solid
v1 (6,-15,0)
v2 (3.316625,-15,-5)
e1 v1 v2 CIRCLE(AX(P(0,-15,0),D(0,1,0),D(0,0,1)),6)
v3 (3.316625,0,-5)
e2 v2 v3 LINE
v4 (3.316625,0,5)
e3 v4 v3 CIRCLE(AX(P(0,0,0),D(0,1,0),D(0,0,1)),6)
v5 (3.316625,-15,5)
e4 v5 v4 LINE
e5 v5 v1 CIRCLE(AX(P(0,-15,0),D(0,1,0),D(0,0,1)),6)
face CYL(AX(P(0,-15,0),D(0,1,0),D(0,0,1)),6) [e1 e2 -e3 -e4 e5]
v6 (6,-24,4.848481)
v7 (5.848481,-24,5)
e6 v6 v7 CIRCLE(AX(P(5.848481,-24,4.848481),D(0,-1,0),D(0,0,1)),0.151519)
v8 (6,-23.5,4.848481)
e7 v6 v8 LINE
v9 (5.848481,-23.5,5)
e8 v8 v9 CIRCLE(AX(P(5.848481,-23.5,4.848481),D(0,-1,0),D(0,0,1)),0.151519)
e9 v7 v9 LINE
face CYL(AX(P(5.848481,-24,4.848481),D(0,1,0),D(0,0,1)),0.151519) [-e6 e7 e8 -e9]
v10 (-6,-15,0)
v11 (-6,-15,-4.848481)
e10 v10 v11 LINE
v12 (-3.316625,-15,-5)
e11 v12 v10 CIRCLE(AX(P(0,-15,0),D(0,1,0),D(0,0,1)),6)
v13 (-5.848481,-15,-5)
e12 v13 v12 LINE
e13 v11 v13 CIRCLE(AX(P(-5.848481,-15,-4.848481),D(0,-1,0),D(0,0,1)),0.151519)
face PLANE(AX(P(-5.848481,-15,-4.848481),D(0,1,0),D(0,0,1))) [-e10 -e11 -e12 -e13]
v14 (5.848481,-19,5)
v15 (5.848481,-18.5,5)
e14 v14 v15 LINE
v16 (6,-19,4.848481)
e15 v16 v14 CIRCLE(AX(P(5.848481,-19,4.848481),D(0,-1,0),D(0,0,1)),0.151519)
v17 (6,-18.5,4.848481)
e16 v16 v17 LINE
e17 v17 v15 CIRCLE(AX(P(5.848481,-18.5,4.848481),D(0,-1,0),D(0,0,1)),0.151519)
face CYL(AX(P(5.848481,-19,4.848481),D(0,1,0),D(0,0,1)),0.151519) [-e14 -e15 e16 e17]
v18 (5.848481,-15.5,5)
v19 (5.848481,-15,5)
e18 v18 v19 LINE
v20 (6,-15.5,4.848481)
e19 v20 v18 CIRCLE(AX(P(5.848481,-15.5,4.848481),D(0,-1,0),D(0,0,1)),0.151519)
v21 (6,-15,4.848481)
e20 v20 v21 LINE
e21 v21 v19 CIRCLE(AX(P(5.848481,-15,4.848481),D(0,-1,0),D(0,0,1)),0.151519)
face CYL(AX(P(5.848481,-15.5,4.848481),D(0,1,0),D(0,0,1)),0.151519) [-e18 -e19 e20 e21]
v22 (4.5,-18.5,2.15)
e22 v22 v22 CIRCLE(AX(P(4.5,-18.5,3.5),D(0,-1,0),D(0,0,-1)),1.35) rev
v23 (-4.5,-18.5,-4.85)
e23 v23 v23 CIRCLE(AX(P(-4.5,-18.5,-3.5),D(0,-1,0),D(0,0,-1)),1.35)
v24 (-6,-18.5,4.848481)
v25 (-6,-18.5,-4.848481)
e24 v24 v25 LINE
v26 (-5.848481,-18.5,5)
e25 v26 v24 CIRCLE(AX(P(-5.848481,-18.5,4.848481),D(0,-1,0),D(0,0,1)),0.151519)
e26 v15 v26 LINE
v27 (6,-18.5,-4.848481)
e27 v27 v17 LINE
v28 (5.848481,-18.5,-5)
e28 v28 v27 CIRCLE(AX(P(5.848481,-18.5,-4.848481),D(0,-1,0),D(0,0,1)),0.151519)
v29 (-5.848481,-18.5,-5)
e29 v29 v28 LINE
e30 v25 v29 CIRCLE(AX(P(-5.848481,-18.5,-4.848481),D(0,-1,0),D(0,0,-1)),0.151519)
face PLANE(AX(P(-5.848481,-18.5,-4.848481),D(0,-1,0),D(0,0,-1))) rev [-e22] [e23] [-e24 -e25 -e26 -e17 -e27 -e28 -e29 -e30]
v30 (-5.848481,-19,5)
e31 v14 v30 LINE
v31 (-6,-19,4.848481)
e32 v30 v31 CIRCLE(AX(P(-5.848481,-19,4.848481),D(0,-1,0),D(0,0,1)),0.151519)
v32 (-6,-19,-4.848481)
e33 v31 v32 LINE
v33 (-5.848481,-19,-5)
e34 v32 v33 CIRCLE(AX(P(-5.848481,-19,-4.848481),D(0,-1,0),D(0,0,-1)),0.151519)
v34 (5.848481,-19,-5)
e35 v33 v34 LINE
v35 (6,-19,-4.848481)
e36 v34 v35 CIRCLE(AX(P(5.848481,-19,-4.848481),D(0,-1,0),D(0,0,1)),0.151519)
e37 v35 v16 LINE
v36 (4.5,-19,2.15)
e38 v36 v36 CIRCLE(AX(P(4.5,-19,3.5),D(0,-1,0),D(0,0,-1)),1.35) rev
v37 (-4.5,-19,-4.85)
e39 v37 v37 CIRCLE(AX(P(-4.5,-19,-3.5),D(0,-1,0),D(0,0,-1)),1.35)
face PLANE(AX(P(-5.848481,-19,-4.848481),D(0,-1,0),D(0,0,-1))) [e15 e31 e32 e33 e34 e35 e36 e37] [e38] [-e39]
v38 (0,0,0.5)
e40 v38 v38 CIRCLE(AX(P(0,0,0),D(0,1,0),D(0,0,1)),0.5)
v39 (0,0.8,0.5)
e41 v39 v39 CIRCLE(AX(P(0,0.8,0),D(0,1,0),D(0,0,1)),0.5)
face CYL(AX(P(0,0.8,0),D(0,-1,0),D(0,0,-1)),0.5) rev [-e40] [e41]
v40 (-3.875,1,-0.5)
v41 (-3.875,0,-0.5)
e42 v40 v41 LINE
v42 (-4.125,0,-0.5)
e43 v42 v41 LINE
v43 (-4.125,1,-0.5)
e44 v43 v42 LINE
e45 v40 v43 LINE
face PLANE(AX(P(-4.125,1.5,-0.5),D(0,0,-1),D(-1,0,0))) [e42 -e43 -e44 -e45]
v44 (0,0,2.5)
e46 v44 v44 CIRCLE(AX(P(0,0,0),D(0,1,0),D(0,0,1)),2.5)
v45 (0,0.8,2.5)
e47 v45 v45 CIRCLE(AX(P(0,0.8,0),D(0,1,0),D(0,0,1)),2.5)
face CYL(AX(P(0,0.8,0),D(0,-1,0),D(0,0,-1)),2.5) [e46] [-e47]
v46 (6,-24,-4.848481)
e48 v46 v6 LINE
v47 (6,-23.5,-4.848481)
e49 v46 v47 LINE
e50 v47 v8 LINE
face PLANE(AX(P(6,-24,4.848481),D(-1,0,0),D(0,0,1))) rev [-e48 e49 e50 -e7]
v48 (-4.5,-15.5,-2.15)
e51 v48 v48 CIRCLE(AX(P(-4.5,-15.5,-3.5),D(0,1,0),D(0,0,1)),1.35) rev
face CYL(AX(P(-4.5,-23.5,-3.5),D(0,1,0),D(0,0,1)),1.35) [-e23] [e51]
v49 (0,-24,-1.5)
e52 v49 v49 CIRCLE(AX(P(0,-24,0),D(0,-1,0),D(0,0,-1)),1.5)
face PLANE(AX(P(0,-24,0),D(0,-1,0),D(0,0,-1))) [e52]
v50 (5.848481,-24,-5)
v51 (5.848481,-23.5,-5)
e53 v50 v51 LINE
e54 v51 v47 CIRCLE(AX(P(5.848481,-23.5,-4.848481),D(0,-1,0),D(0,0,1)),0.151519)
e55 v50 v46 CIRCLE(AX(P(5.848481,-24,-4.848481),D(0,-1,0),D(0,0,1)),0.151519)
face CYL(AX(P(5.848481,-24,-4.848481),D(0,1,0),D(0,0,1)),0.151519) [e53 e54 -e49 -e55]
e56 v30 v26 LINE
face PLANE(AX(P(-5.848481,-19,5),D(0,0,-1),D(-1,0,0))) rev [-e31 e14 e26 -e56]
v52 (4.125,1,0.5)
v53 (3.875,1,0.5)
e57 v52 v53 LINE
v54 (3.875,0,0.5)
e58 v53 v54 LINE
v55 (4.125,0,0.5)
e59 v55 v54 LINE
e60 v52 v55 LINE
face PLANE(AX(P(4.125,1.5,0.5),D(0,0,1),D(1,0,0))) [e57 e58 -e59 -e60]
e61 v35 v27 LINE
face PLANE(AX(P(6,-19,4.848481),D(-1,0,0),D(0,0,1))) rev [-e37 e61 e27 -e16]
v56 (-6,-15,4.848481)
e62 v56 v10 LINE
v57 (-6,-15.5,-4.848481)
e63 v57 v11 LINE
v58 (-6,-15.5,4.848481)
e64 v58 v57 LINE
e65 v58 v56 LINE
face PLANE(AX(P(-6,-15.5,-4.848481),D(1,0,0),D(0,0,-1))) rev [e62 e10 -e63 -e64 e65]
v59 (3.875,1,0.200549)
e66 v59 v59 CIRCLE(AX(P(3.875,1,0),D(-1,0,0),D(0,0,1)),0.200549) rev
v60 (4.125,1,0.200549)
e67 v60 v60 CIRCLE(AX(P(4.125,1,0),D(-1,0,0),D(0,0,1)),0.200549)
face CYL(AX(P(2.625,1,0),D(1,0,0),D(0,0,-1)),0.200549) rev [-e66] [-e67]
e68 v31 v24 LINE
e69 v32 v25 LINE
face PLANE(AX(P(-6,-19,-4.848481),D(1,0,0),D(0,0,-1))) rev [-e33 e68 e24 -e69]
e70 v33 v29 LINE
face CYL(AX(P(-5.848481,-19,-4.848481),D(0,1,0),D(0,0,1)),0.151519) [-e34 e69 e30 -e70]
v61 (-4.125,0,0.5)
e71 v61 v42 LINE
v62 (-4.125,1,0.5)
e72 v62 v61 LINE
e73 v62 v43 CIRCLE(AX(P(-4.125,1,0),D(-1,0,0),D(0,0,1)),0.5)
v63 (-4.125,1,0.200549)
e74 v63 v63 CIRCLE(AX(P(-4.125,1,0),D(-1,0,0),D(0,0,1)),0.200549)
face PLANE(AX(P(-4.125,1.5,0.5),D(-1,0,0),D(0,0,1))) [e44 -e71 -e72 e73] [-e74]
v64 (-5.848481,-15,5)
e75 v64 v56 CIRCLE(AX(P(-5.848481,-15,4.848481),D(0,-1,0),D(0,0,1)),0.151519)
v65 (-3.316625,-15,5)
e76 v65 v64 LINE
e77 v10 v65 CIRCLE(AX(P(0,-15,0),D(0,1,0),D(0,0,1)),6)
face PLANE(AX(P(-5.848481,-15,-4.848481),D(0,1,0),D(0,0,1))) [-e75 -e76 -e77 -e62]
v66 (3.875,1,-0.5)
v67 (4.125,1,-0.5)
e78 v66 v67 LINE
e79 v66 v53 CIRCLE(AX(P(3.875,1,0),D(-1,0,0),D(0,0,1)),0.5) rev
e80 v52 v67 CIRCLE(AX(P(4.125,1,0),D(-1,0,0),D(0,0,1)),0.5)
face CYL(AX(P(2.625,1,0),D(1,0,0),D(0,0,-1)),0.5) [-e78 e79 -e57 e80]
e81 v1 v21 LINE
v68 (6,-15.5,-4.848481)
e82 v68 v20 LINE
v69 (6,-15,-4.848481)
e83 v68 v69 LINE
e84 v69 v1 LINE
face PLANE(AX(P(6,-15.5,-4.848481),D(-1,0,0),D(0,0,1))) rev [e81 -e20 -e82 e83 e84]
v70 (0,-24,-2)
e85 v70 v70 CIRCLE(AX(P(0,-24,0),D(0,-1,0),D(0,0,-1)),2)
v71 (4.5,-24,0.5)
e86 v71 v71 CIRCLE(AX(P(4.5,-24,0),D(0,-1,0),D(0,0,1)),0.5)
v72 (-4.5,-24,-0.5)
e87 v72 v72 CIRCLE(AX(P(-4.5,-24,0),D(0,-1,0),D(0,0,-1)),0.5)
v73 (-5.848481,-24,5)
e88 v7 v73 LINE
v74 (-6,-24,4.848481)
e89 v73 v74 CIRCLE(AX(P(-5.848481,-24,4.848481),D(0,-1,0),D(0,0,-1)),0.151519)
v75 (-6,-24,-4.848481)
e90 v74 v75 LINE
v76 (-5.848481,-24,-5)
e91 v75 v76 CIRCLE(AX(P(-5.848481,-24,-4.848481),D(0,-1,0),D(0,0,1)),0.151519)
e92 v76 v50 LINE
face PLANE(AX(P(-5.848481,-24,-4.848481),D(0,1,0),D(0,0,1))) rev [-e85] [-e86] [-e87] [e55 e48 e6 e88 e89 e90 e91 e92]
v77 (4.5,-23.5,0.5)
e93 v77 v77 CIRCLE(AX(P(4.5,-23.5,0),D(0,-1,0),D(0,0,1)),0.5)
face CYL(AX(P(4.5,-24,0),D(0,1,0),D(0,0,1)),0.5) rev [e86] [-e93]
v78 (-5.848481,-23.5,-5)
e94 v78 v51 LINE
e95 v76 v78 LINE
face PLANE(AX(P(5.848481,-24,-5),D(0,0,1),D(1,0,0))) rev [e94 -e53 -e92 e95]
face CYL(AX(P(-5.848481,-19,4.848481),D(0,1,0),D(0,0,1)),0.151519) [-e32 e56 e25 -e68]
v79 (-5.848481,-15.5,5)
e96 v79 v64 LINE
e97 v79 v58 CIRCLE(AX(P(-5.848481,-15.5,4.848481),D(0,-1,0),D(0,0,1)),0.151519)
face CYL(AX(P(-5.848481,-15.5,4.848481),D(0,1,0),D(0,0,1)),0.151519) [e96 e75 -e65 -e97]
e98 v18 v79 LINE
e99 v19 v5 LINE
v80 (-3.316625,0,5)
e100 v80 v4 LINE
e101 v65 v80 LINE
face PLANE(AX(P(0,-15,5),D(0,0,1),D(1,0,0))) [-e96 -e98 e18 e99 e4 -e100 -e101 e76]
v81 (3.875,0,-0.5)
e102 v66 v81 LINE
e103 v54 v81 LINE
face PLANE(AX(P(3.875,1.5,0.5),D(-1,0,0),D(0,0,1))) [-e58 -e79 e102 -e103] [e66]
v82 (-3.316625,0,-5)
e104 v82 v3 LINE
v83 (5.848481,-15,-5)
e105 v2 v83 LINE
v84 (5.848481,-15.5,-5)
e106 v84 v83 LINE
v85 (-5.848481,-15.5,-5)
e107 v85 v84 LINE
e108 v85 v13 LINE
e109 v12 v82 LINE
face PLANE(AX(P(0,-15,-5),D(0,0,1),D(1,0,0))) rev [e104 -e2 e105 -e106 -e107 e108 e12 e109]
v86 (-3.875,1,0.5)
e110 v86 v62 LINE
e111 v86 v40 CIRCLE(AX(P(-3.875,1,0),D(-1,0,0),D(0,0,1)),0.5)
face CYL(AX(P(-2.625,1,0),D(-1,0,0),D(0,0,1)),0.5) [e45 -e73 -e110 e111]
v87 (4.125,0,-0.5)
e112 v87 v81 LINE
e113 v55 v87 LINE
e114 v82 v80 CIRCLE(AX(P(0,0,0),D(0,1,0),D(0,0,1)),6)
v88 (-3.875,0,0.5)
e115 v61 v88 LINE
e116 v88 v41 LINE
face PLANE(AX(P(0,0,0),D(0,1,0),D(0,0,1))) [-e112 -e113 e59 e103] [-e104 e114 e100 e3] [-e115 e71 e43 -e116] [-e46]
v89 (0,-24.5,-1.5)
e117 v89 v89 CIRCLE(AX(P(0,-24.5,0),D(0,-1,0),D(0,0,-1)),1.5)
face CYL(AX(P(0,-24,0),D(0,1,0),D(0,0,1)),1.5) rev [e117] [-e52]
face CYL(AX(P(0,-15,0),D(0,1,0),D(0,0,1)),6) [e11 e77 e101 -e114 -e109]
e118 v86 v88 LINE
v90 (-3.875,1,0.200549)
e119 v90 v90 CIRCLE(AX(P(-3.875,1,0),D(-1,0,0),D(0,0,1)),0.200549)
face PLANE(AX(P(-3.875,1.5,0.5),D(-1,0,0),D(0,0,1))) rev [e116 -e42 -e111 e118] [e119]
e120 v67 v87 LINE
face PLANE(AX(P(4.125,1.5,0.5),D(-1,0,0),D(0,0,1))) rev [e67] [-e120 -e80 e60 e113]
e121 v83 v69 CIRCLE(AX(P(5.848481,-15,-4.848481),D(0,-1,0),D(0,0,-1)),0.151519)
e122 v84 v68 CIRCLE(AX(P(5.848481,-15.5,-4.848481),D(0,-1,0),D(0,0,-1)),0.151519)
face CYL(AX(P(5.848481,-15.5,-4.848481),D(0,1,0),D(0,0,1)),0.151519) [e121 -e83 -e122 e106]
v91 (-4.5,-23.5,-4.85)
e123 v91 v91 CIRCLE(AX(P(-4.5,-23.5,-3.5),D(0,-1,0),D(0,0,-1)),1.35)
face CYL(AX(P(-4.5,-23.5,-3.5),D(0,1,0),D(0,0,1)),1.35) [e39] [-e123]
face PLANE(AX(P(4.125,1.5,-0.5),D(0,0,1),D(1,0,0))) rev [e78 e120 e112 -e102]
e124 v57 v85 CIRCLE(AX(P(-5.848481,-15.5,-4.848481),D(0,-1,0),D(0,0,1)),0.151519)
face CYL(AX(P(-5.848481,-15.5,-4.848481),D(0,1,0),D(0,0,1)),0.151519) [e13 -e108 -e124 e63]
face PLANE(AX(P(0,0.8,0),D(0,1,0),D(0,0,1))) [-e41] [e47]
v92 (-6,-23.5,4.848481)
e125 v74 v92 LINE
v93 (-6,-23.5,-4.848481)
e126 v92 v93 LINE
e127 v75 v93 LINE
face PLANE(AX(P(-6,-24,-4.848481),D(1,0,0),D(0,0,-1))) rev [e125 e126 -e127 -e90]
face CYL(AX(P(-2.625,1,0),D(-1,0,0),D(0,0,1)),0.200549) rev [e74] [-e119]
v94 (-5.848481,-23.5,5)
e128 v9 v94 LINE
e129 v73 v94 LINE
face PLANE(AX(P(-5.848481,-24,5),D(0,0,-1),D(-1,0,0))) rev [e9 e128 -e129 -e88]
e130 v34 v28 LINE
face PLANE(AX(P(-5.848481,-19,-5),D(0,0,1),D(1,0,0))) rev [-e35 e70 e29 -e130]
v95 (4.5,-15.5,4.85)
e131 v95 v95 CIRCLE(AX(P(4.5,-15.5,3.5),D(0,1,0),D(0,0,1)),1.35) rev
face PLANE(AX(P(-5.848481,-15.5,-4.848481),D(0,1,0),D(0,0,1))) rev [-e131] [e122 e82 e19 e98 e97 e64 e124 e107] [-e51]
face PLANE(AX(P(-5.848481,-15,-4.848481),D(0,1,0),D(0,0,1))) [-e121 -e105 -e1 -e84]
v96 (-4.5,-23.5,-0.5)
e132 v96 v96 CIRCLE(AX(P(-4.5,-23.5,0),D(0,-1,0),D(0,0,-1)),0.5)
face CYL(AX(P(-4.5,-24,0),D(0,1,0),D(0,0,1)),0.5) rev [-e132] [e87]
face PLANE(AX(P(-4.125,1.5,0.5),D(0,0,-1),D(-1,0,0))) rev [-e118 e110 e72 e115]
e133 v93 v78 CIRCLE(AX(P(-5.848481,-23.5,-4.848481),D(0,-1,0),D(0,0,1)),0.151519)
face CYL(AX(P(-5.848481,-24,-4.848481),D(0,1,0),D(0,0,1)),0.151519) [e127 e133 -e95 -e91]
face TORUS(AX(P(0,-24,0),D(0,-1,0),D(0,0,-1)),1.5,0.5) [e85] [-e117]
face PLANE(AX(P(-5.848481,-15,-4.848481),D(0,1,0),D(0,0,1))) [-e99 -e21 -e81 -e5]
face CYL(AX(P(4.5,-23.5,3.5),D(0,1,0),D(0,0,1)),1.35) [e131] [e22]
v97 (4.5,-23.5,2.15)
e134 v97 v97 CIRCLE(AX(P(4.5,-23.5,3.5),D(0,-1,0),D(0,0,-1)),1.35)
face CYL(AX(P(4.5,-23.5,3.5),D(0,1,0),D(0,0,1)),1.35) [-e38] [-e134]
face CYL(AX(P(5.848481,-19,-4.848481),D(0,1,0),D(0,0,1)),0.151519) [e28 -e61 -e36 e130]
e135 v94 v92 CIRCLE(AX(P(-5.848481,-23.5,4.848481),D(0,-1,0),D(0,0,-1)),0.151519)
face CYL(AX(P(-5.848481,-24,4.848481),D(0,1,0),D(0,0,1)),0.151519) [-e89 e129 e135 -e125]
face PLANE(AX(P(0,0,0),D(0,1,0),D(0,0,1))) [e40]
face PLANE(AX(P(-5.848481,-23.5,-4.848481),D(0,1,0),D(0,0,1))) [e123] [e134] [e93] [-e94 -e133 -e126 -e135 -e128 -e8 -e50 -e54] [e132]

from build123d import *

# Parameters (mm, degrees)
SKETCH1_R            = 2.5
SKETCH1_W            = 0.25
SKETCH1_H            = 1
SKETCH1_R_2          = 0.5
BOSS_EXTRUDE1_DEPTH  = 15
SKETCH1_3_R          = 2.5
SKETCH1_3_R_2        = 0.5
BOSS_EXTRUDE2_DEPTH  = 0.8
SKETCH1_5_W          = 0.25
SKETCH1_5_H          = 1
BOSS_EXTRUDE3_DEPTH  = 1.5
SKETCH2_R            = 0.200548898
CUT_EXTRUDE3_DEPTH   = 1.5
BOSS_EXTRUDE4_DEPTH  = 0.5
BOSS_EXTRUDE6_START  = 3
BOSS_EXTRUDE6_DEPTH  = 0.5
SKETCH6_R            = 1.35
BOSS_EXTRUDE7_DEPTH  = 8
BOSS_EXTRUDE9_START  = 4.5
SKETCH9_R            = 0.5
SKETCH9_R_2          = 1.5
BOSS_EXTRUDE9_DEPTH  = 0.5
SKETCH10_R           = 2
SKETCH10_R_2         = 1.5
BOSS_EXTRUDE10_DEPTH = 0.5
FILLET1_R            = 0.5
BOSS_EXTRUDE11_START = -0.5
SKETCH11_R           = 1.5
BOSS_EXTRUDE11_DEPTH = 0.5


with BuildPart() as part:
    # Sketch1 → Boss-Extrude1 (new body)
    # profile 1 of 5: a face of its own
    with BuildSketch(Plane(origin=(0, 0, 0), x_dir=(1, 0, 0), z_dir=(0, 1, 0))):
        with BuildLine():
            Line((-3.31662479, -5), (3.31662479, -5))
            ThreePointArc((3.31662479, -5), (6, 0), (3.31662479, 5))
            Line((3.31662479, 5), (-3.31662479, 5))
            ThreePointArc((-3.31662479, 5), (-6, 0), (-3.31662479, -5))
        make_face()
        Circle(SKETCH1_R, mode=Mode.SUBTRACT)
        with Locations((4, 0)):
            Rectangle(SKETCH1_W, SKETCH1_H, mode=Mode.SUBTRACT)
        with Locations((-4, 0)):
            Rectangle(SKETCH1_W, SKETCH1_H, mode=Mode.SUBTRACT)
    # profile 2 of 5: a face of its own
    with BuildSketch(Plane(origin=(0, 0, 0), x_dir=(1, 0, 0), z_dir=(0, 1, 0))):
        Circle(SKETCH1_R)
        Circle(SKETCH1_R_2, mode=Mode.SUBTRACT)
    # profile 3 of 5: a face of its own
    with BuildSketch(Plane(origin=(0, 0, 0), x_dir=(1, 0, 0), z_dir=(0, 1, 0))):
        with Locations((-4, 0)):
            Rectangle(SKETCH1_W, SKETCH1_H)
    # profile 4 of 5: a face of its own
    with BuildSketch(Plane(origin=(0, 0, 0), x_dir=(1, 0, 0), z_dir=(0, 1, 0))):
        Circle(SKETCH1_R_2)
    # profile 5 of 5: a face of its own
    with BuildSketch(Plane(origin=(0, 0, 0), x_dir=(1, 0, 0), z_dir=(0, 1, 0))):
        with Locations((4, 0)):
            Rectangle(SKETCH1_W, SKETCH1_H)
    extrude(amount=-BOSS_EXTRUDE1_DEPTH)

    # Sketch1<3> → Boss-Extrude2 (add)
    with BuildSketch(Plane(origin=(0, 0, 0), x_dir=(1, 0, 0), z_dir=(0, 1, 0))):
        with Locations(Location((0, 0, 0), (0, 0, 270))):
            Circle(SKETCH1_3_R)
        with Locations(Location((0, 0, 0), (0, 0, 270))):
            Circle(SKETCH1_3_R_2, mode=Mode.SUBTRACT)
    extrude(amount=BOSS_EXTRUDE2_DEPTH)

    # Sketch1<5> → Boss-Extrude3 (add)
    with BuildSketch(Plane(origin=(0, 0, 0), x_dir=(1, 0, 0), z_dir=(0, 1, 0))):
        with Locations((-4, 0)):
            Rectangle(SKETCH1_5_W, SKETCH1_5_H)
    boss_extrude3 = extrude(amount=BOSS_EXTRUDE3_DEPTH)

    # Sketch2 → Cut-Extrude3 (cut)
    with BuildSketch(Plane.ZY.offset(4.125)):
        with Locations((0, 1)):
            Circle(SKETCH2_R)
        with BuildLine():
            Line((-0.5, 1.5), (-0.5, 1))
            ThreePointArc((-0.5, 1), (-0.353553391, 1.353553391), (0, 1.5))
            Line((0, 1.5), (-0.5, 1.5))
        make_face()
        with BuildLine():
            Line((0.5, 1.5), (0, 1.5))
            ThreePointArc((0, 1.5), (0.353553391, 1.353553391), (0.5, 1))
            Line((0.5, 1), (0.5, 1.5))
        make_face()
    cut_extrude3 = extrude(amount=-CUT_EXTRUDE3_DEPTH, mode=Mode.SUBTRACT)

    # Mirror1: Boss-Extrude3, Cut-Extrude3 across plane
    add(boss_extrude3.mirror(Plane(origin=(0, 0, 0), x_dir=(0, 0, 1), z_dir=(1, 0, 0))))
    add(cut_extrude3.mirror(Plane(origin=(0, 0, 0), x_dir=(0, 0, 1), z_dir=(1, 0, 0))), mode=Mode.SUBTRACT)

    # Sketch3 → Boss-Extrude4 (add)
    with BuildSketch(Plane.XZ.offset(15)):
        with BuildLine():
            Line((-5.84848114, -5), (5.84848114, -5))
            ThreePointArc((5.84848114, -5), (5.955621153, -4.955621153), (6, -4.84848114))
            Line((6, -4.84848114), (6, 4.84848114))
            ThreePointArc((6, 4.84848114), (5.955621153, 4.955621153), (5.84848114, 5))
            Line((5.84848114, 5), (-5.84848114, 5))
            ThreePointArc((-5.84848114, 5), (-5.955621153, 4.955621153), (-6, 4.84848114))
            Line((-6, 4.84848114), (-6, -4.84848114))
            ThreePointArc((-6, -4.84848114), (-5.955621153, -4.955621153), (-5.84848114, -5))
        make_face()
    extrude(amount=BOSS_EXTRUDE4_DEPTH)



with BuildPart() as body_2:
    # Sketch7 → Boss-Extrude6 (new body)
    with BuildSketch(Plane.XZ.offset(15.5).offset(BOSS_EXTRUDE6_START)):
        with BuildLine():
            Line((-6, -4.84848114), (-6, 4.84848114))
            ThreePointArc((-6, 4.84848114), (-5.955621153, 4.955621153), (-5.84848114, 5))
            Line((-5.84848114, 5), (5.84848114, 5))
            ThreePointArc((5.84848114, 5), (5.955621153, 4.955621153), (6, 4.84848114))
            Line((6, 4.84848114), (6, -4.84848114))
            ThreePointArc((6, -4.84848114), (5.955621153, -4.955621153), (5.84848114, -5))
            Line((5.84848114, -5), (-5.84848114, -5))
            ThreePointArc((-5.84848114, -5), (-5.955621153, -4.955621153), (-6, -4.84848114))
        make_face()
    extrude(amount=BOSS_EXTRUDE6_DEPTH)


with BuildPart() as part_1:
    add(part.part)

    add(body_2.part)  # Boss-Extrude7 merges body 2
    # Sketch6 → Boss-Extrude7 (add)
    with BuildSketch(Plane.XZ.offset(15.5)):
        with Locations(Location((-4.5, -3.5, 0), (0, 0, 90))):
            Circle(SKETCH6_R)
        with Locations(Location((4.5, 3.5, 0), (0, 0, 90))):
            Circle(SKETCH6_R)
    extrude(amount=BOSS_EXTRUDE7_DEPTH)

    # Sketch9 → Boss-Extrude9 (add)
    with BuildSketch(Plane.XZ.offset(19).offset(BOSS_EXTRUDE9_START)):
        with BuildLine():
            Line((-5.84848114, 5), (5.84848114, 5))
            ThreePointArc((5.84848114, 5), (5.955621153, 4.955621153), (6, 4.84848114))
            Line((6, 4.84848114), (6, -4.84848114))
            ThreePointArc((6, -4.84848114), (5.955621153, -4.955621153), (5.84848114, -5))
            Line((5.84848114, -5), (-5.84848114, -5))
            ThreePointArc((-5.84848114, -5), (-5.955621153, -4.955621153), (-6, -4.84848114))
            Line((-6, -4.84848114), (-6, 4.84848114))
            ThreePointArc((-6, 4.84848114), (-5.955621153, 4.955621153), (-5.84848114, 5))
        make_face()
        with Locations(Location((-4.5, 0, 0), (0, 0, 270))):
            Circle(SKETCH9_R, mode=Mode.SUBTRACT)
        with Locations(Location((4.5, 0, 0), (0, 0, 90))):
            Circle(SKETCH9_R, mode=Mode.SUBTRACT)
        with Locations(Location((0, 0, 0), (0, 0, 270))):
            Circle(SKETCH9_R_2, mode=Mode.SUBTRACT)
    extrude(amount=BOSS_EXTRUDE9_DEPTH)

    # Sketch10 → Boss-Extrude10 (add)
    with BuildSketch(Plane.XZ.offset(24)):
        with Locations(Location((0, 0, 0), (0, 0, 270))):
            Circle(SKETCH10_R)
        with Locations(Location((0, 0, 0), (0, 0, 270))):
            Circle(SKETCH10_R_2, mode=Mode.SUBTRACT)
    extrude(amount=BOSS_EXTRUDE10_DEPTH)

    # Fillet1
    fillet1_edges = [part_1.edges().sort_by_distance(p)[0] for p in [
        (0, -24.5, 2),
    ]]
    fillet(fillet1_edges, radius=FILLET1_R - 0.0001)  # a hair under: the kernel refuses the full size

    # Sketch11 → Boss-Extrude11 (add)
    with BuildSketch(Plane.XZ.offset(24).offset(BOSS_EXTRUDE11_START)):
        with Locations(Location((0, 0, 0), (0, 0, 270))):
            Circle(SKETCH11_R)
    extrude(amount=BOSS_EXTRUDE11_DEPTH)


solid = part_1.part
